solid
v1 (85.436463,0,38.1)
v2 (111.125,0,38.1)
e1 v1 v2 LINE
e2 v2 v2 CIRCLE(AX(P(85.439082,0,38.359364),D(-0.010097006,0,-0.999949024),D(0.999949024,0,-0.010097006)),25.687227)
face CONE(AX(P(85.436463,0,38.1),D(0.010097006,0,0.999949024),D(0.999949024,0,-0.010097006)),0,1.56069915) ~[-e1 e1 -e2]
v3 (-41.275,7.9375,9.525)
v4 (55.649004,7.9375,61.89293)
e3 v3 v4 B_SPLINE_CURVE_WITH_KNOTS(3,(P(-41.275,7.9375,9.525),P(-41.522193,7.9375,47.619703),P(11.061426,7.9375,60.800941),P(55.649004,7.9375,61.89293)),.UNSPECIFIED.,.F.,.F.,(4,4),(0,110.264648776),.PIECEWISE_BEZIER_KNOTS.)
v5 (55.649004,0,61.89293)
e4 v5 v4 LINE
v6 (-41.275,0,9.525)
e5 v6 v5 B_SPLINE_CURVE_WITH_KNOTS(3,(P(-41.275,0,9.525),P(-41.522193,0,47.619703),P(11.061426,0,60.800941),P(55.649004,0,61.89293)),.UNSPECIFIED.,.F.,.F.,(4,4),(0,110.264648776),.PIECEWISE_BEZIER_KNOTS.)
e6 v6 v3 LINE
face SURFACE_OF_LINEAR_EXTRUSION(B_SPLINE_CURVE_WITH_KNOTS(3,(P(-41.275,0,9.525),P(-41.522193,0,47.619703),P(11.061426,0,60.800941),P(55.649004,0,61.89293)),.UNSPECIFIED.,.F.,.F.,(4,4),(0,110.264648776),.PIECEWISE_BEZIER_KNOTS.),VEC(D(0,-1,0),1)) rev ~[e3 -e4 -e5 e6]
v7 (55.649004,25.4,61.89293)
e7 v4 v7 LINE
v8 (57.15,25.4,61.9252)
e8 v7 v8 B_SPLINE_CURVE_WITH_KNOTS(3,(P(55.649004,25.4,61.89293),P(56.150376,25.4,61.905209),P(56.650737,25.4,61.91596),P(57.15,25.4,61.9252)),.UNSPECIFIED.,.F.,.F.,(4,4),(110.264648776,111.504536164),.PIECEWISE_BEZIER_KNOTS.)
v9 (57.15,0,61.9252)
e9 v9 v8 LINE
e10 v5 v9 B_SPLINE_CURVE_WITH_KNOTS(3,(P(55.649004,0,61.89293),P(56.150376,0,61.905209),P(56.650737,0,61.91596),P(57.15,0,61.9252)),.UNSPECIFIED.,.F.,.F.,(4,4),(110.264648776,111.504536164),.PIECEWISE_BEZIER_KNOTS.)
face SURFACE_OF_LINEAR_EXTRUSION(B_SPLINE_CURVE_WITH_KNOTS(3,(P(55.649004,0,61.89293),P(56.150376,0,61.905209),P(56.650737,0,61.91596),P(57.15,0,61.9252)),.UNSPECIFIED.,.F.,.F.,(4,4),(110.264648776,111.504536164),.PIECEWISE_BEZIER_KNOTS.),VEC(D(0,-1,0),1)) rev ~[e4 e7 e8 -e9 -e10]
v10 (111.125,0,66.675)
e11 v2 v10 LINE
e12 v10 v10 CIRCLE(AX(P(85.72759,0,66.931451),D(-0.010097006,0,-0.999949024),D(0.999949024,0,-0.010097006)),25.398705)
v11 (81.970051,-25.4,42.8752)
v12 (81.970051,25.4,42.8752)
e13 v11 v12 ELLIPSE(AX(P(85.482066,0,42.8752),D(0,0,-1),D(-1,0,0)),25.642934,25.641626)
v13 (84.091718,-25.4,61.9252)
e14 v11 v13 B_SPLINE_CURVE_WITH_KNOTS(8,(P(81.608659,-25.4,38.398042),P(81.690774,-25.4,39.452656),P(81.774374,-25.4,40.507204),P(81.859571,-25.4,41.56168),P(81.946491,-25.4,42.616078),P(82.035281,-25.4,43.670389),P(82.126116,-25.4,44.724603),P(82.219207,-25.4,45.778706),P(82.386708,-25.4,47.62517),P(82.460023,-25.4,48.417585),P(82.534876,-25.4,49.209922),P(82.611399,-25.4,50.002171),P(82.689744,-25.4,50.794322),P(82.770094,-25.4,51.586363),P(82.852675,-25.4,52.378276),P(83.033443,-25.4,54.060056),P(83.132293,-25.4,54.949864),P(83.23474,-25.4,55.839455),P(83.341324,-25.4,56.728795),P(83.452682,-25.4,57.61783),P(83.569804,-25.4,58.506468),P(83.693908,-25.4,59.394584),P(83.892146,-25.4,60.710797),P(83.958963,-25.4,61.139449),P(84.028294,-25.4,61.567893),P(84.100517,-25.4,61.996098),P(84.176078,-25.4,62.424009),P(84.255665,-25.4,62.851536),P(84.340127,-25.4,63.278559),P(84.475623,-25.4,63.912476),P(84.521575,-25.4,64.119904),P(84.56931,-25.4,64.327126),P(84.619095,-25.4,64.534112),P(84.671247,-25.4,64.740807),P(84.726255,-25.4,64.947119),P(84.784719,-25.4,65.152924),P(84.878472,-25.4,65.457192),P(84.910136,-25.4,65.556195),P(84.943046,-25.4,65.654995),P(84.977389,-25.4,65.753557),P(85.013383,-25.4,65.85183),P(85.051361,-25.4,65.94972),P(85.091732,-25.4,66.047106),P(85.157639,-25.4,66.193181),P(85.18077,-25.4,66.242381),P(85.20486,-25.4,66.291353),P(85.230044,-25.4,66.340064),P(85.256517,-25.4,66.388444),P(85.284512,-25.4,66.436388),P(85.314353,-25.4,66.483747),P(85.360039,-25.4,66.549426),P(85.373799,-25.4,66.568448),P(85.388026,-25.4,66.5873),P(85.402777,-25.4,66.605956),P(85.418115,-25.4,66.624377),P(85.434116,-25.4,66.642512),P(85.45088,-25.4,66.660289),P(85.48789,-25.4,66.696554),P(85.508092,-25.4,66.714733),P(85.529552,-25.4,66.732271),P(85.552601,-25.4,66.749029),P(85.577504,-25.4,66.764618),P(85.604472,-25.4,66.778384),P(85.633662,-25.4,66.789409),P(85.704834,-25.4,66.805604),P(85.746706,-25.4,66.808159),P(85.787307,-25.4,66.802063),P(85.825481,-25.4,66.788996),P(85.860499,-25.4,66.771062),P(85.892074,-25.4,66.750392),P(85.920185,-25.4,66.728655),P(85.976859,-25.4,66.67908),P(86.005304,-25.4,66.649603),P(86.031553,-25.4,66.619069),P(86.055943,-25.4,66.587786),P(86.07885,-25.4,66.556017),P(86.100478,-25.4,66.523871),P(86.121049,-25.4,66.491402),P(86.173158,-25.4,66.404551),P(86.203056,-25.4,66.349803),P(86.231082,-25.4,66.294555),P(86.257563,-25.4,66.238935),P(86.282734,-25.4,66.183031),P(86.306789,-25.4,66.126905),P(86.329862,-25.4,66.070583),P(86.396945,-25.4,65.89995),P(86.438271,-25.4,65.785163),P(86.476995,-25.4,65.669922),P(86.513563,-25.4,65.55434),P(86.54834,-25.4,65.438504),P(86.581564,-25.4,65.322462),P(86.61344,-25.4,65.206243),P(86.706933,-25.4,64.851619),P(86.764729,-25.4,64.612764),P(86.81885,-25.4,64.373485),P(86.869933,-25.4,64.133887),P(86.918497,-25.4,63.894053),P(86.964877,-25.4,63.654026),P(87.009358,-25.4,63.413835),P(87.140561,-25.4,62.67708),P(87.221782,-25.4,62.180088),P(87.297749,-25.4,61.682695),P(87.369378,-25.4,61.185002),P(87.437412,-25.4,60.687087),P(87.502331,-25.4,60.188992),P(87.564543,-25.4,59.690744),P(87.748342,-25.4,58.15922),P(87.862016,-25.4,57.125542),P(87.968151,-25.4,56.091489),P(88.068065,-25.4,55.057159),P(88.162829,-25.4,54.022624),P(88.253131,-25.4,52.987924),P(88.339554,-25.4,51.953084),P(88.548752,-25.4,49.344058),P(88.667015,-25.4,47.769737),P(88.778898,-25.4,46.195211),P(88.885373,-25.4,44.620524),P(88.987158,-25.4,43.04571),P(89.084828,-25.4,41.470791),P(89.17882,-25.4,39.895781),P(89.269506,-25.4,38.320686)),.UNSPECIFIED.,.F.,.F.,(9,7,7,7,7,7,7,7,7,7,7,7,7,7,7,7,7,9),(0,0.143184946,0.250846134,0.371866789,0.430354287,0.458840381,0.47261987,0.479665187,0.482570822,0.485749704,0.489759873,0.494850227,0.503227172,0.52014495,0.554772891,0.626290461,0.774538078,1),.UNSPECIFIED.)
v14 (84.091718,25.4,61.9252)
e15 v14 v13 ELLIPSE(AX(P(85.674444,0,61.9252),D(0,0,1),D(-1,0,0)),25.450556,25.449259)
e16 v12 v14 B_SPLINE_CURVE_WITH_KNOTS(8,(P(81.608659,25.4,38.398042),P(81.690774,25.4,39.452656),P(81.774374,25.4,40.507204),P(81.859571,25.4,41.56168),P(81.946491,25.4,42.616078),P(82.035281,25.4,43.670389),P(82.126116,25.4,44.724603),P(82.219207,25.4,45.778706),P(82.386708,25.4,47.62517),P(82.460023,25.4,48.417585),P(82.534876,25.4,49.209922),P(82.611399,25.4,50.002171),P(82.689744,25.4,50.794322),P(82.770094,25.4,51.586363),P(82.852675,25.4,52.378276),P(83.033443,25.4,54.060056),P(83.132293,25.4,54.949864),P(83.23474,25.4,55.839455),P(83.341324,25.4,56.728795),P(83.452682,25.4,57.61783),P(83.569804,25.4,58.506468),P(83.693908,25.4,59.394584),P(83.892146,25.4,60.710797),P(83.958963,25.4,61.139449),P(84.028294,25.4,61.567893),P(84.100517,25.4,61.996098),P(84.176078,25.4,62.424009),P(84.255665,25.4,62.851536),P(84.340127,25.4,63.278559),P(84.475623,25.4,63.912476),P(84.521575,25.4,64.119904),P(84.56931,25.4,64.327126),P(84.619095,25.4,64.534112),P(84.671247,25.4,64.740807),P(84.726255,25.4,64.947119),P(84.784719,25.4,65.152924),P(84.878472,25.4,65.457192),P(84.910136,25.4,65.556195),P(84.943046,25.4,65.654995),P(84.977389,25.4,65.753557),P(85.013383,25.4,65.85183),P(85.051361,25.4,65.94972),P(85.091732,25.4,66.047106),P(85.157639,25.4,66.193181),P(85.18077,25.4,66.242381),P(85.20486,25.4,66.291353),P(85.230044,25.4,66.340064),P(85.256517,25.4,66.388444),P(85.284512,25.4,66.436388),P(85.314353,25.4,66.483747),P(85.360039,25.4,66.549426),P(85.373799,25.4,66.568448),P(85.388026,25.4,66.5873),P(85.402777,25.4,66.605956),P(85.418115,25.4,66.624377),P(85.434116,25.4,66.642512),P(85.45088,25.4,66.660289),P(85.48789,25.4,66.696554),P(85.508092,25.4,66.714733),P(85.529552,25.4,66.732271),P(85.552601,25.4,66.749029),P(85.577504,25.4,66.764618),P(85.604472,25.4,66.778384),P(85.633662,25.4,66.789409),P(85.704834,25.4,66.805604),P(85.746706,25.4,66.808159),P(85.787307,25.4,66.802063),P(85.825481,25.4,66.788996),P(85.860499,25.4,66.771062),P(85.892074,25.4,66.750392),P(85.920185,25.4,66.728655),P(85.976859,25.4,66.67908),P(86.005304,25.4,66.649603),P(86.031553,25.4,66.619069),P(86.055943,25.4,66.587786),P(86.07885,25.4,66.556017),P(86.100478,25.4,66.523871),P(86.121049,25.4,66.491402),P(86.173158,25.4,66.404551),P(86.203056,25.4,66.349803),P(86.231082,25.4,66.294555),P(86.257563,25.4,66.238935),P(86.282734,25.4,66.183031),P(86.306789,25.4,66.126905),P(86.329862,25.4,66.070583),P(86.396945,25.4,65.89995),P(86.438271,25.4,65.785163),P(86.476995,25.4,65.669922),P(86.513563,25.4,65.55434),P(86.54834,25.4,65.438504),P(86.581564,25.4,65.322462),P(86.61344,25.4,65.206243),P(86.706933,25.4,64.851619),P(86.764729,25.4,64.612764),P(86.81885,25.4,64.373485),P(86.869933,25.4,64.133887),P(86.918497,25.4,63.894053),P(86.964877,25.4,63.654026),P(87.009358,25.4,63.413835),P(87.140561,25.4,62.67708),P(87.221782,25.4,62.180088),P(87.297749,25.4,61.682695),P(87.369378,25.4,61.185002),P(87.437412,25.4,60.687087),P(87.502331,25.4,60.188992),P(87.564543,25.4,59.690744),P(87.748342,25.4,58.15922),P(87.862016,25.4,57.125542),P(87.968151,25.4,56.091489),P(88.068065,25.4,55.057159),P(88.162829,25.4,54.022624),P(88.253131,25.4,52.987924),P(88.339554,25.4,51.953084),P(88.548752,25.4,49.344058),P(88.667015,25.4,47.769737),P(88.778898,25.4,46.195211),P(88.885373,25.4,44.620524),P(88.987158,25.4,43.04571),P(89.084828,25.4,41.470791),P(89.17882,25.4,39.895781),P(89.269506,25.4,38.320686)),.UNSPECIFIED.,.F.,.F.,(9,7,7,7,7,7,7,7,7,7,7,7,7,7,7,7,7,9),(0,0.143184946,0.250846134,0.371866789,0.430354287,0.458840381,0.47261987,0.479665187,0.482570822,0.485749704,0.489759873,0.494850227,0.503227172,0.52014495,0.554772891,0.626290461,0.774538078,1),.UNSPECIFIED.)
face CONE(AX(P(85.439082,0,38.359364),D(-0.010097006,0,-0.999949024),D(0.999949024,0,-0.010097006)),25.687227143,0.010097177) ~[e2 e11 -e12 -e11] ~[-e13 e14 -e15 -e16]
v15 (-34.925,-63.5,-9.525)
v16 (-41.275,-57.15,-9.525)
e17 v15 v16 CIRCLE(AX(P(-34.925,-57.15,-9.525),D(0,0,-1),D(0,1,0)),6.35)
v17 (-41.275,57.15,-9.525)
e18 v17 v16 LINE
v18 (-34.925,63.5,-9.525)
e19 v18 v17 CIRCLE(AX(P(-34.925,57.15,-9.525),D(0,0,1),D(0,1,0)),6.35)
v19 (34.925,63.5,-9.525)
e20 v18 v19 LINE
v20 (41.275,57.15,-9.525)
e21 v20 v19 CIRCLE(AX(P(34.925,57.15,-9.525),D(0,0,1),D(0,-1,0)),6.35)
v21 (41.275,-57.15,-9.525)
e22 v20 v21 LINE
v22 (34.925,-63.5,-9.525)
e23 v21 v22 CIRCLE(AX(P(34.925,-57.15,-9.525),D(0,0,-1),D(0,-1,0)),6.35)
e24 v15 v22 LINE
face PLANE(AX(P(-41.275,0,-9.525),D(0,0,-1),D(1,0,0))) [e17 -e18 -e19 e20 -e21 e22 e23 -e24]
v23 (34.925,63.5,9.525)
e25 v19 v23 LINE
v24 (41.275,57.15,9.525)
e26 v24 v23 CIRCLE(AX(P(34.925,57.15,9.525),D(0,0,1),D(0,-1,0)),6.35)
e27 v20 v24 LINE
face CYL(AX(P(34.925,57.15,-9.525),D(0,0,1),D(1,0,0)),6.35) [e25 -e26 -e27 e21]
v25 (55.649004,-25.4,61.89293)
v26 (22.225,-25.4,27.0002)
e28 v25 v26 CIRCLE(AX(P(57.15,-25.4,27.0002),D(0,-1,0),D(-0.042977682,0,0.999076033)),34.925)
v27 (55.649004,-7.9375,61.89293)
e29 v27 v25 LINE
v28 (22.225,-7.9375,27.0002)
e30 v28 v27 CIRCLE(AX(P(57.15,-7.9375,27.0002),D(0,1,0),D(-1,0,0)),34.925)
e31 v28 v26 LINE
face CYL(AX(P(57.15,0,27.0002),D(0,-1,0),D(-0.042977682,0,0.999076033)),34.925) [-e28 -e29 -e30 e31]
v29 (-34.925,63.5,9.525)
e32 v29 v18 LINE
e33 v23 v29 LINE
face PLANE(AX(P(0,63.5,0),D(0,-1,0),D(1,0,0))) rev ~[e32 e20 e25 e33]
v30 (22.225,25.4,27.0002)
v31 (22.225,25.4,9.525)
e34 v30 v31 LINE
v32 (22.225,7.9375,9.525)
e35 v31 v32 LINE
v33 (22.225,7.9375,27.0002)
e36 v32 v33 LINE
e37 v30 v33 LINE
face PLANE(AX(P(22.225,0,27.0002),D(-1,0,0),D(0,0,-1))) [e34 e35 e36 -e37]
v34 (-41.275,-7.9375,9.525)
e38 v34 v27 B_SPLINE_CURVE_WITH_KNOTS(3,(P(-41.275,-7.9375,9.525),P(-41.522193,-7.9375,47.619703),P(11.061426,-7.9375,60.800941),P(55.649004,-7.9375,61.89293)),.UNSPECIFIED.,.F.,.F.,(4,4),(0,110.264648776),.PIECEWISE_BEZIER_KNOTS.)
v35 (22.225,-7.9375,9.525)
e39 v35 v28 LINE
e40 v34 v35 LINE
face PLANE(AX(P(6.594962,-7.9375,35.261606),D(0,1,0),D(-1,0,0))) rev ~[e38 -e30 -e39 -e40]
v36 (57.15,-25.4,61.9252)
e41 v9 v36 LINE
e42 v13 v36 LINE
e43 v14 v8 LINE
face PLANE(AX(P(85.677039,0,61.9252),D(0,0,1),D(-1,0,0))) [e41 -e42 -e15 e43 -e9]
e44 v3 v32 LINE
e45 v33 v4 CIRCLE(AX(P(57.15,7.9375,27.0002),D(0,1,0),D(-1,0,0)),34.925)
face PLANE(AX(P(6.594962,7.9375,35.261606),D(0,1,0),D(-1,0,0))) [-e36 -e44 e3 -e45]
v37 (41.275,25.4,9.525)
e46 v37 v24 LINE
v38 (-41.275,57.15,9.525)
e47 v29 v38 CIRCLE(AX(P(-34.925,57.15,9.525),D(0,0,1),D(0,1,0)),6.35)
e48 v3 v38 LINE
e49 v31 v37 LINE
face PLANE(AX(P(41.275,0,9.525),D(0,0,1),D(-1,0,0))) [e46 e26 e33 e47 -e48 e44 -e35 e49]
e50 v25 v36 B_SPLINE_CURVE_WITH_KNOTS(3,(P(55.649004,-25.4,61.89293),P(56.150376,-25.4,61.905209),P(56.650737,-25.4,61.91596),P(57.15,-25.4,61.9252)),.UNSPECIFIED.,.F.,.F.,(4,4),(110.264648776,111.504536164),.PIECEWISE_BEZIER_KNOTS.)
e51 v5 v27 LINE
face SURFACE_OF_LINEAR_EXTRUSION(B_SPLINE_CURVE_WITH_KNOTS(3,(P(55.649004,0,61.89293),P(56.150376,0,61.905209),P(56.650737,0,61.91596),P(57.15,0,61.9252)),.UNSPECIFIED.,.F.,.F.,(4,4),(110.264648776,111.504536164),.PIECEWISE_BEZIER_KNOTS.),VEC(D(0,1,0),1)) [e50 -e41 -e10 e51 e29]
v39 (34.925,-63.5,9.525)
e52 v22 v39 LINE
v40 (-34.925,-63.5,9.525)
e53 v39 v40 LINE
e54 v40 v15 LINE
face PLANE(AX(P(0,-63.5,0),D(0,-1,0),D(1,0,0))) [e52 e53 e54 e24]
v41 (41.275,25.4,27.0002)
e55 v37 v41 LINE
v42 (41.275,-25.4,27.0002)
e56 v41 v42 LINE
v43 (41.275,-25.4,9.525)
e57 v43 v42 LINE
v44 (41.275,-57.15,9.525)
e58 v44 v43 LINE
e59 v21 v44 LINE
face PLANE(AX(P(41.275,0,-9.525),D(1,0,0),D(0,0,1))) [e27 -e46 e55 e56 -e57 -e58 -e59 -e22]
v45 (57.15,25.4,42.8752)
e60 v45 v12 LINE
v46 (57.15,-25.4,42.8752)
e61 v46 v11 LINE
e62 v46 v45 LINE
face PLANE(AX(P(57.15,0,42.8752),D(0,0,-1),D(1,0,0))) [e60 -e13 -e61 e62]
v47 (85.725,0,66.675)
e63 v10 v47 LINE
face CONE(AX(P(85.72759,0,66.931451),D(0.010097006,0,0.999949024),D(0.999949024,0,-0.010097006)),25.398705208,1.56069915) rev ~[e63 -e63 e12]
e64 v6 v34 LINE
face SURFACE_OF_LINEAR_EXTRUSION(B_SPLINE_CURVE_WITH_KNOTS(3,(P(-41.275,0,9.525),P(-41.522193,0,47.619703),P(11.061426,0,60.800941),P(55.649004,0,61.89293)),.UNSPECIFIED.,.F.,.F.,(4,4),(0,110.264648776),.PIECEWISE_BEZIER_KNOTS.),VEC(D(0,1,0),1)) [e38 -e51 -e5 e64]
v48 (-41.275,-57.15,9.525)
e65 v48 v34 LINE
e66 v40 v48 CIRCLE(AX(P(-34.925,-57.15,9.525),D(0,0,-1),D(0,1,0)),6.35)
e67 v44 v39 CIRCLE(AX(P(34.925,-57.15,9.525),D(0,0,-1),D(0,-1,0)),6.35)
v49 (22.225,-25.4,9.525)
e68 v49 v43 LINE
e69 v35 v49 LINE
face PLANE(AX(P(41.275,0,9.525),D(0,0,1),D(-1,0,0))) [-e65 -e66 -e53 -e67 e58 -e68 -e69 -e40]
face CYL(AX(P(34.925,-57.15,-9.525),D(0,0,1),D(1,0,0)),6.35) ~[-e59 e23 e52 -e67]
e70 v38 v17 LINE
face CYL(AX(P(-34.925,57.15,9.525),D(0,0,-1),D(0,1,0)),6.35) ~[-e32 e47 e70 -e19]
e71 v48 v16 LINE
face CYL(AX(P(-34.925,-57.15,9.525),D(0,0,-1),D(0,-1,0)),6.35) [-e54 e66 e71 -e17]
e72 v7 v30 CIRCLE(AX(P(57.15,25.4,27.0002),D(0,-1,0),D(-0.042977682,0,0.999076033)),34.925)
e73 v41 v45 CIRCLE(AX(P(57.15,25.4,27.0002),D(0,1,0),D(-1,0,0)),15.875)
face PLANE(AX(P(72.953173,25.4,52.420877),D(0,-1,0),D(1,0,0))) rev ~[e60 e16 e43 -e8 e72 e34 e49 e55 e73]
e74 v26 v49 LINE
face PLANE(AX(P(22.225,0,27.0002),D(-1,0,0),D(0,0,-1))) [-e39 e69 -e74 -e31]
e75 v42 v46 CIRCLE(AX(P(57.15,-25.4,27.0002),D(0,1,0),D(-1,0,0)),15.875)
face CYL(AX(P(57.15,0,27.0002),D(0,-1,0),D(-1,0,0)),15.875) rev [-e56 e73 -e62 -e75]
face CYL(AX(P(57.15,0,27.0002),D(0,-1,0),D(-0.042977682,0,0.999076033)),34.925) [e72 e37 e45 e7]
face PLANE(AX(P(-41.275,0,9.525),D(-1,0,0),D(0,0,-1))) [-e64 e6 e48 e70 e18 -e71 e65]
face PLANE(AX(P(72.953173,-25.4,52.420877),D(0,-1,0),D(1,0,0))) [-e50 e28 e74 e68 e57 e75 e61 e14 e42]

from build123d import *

# Parameters (mm, degrees)
F1_DEPTH = 63.5
F2_DEPTH = 25.4
F3_DEPTH = 7.9375
F5_R     = 6.35


with BuildPart() as f1:
    # F0 (on Front) → F1 (new body, symmetric)
    with BuildSketch(Plane.XZ):
        Polygon((-41.275, 9.525), (-41.275, -9.525), (41.275, -9.525), (41.275, 9.525), (22.225, 9.525), align=None)
    extrude(amount=F1_DEPTH, both=True)

    # F0 (on Front) → F2 (join, symmetric)
    with BuildSketch(Plane.XZ):
        Polygon((85.6770387978, 61.9252), (60.325, 61.9252), (60.325, 42.8752), (85.4846810352, 42.8752), align=None)
        with BuildLine():
            Line((22.225, 9.525), (41.275, 9.525))
            Line((41.275, 9.525), (41.275, 27.0002))
            ThreePointArc((41.275, 27.0002), (45.9246798487, 38.2255201513), (57.15, 42.8752))
            Line((57.15, 42.8752), (60.325, 42.8752))
            Line((60.325, 42.8752), (60.325, 61.9252))
            Line((60.325, 61.9252), (57.15, 61.9252))
            add(Edge.make_bspline(
                [(55.6490044481, 61.8929304371), (56.1503761632, 61.905209471), (56.6507368417, 61.9159599142), (57.15, 61.9252)],
                knots=[110.2646487764, 110.2646487764, 110.2646487764, 110.2646487764, 111.5045361635, 111.5045361635, 111.5045361635, 111.5045361635], degree=3))
            ThreePointArc((55.6490044481, 61.8929304371), (31.9291961404, 51.1593944749), (22.225, 27.0002))
            Line((22.225, 27.0002), (22.225, 9.525))
        make_face()
    extrude(amount=F2_DEPTH, both=True)

    # F0 (on Front) → F3 (join, symmetric)
    with BuildSketch(Plane.XZ):
        with BuildLine():
            add(Edge.make_bspline(
                [(-41.275, 9.525), (-41.522193166, 47.6197025146), (11.061426055, 60.8009414524), (55.6490044481, 61.8929304371)],
                knots=[0, 0, 0, 0, 110.2646487764, 110.2646487764, 110.2646487764, 110.2646487764], degree=3))
            Line((-41.275, 9.525), (22.225, 9.525))
            Line((22.225, 9.525), (22.225, 27.0002))
            ThreePointArc((22.225, 27.0002), (31.9291961404, 51.1593944749), (55.6490044481, 61.8929304371))
        make_face()
    extrude(amount=F3_DEPTH, both=True)

    # F0 (on Front) → F4 (revolve)
    with BuildSketch(Plane.XZ):
        Polygon((85.725, 66.675), (85.6770387978, 61.9252), (85.4846810352, 42.8752), (85.436463356, 38.1), (111.125, 38.1), (111.125, 66.675), align=None)
    revolve(axis=Axis((85.580731678, 0, 52.3875), (-0.0100970056, 0, -0.9999490239)))

    # F5
    f5_edges = [f1.edges().sort_by_distance(p)[0] for p in [
        (-41.275, -63.5, 0),
        (41.275, -63.5, 0),
        (41.275, 63.5, 0),
        (-41.275, 63.5, 0),
    ]]
    fillet(f5_edges, radius=F5_R)


solid = f1.part
